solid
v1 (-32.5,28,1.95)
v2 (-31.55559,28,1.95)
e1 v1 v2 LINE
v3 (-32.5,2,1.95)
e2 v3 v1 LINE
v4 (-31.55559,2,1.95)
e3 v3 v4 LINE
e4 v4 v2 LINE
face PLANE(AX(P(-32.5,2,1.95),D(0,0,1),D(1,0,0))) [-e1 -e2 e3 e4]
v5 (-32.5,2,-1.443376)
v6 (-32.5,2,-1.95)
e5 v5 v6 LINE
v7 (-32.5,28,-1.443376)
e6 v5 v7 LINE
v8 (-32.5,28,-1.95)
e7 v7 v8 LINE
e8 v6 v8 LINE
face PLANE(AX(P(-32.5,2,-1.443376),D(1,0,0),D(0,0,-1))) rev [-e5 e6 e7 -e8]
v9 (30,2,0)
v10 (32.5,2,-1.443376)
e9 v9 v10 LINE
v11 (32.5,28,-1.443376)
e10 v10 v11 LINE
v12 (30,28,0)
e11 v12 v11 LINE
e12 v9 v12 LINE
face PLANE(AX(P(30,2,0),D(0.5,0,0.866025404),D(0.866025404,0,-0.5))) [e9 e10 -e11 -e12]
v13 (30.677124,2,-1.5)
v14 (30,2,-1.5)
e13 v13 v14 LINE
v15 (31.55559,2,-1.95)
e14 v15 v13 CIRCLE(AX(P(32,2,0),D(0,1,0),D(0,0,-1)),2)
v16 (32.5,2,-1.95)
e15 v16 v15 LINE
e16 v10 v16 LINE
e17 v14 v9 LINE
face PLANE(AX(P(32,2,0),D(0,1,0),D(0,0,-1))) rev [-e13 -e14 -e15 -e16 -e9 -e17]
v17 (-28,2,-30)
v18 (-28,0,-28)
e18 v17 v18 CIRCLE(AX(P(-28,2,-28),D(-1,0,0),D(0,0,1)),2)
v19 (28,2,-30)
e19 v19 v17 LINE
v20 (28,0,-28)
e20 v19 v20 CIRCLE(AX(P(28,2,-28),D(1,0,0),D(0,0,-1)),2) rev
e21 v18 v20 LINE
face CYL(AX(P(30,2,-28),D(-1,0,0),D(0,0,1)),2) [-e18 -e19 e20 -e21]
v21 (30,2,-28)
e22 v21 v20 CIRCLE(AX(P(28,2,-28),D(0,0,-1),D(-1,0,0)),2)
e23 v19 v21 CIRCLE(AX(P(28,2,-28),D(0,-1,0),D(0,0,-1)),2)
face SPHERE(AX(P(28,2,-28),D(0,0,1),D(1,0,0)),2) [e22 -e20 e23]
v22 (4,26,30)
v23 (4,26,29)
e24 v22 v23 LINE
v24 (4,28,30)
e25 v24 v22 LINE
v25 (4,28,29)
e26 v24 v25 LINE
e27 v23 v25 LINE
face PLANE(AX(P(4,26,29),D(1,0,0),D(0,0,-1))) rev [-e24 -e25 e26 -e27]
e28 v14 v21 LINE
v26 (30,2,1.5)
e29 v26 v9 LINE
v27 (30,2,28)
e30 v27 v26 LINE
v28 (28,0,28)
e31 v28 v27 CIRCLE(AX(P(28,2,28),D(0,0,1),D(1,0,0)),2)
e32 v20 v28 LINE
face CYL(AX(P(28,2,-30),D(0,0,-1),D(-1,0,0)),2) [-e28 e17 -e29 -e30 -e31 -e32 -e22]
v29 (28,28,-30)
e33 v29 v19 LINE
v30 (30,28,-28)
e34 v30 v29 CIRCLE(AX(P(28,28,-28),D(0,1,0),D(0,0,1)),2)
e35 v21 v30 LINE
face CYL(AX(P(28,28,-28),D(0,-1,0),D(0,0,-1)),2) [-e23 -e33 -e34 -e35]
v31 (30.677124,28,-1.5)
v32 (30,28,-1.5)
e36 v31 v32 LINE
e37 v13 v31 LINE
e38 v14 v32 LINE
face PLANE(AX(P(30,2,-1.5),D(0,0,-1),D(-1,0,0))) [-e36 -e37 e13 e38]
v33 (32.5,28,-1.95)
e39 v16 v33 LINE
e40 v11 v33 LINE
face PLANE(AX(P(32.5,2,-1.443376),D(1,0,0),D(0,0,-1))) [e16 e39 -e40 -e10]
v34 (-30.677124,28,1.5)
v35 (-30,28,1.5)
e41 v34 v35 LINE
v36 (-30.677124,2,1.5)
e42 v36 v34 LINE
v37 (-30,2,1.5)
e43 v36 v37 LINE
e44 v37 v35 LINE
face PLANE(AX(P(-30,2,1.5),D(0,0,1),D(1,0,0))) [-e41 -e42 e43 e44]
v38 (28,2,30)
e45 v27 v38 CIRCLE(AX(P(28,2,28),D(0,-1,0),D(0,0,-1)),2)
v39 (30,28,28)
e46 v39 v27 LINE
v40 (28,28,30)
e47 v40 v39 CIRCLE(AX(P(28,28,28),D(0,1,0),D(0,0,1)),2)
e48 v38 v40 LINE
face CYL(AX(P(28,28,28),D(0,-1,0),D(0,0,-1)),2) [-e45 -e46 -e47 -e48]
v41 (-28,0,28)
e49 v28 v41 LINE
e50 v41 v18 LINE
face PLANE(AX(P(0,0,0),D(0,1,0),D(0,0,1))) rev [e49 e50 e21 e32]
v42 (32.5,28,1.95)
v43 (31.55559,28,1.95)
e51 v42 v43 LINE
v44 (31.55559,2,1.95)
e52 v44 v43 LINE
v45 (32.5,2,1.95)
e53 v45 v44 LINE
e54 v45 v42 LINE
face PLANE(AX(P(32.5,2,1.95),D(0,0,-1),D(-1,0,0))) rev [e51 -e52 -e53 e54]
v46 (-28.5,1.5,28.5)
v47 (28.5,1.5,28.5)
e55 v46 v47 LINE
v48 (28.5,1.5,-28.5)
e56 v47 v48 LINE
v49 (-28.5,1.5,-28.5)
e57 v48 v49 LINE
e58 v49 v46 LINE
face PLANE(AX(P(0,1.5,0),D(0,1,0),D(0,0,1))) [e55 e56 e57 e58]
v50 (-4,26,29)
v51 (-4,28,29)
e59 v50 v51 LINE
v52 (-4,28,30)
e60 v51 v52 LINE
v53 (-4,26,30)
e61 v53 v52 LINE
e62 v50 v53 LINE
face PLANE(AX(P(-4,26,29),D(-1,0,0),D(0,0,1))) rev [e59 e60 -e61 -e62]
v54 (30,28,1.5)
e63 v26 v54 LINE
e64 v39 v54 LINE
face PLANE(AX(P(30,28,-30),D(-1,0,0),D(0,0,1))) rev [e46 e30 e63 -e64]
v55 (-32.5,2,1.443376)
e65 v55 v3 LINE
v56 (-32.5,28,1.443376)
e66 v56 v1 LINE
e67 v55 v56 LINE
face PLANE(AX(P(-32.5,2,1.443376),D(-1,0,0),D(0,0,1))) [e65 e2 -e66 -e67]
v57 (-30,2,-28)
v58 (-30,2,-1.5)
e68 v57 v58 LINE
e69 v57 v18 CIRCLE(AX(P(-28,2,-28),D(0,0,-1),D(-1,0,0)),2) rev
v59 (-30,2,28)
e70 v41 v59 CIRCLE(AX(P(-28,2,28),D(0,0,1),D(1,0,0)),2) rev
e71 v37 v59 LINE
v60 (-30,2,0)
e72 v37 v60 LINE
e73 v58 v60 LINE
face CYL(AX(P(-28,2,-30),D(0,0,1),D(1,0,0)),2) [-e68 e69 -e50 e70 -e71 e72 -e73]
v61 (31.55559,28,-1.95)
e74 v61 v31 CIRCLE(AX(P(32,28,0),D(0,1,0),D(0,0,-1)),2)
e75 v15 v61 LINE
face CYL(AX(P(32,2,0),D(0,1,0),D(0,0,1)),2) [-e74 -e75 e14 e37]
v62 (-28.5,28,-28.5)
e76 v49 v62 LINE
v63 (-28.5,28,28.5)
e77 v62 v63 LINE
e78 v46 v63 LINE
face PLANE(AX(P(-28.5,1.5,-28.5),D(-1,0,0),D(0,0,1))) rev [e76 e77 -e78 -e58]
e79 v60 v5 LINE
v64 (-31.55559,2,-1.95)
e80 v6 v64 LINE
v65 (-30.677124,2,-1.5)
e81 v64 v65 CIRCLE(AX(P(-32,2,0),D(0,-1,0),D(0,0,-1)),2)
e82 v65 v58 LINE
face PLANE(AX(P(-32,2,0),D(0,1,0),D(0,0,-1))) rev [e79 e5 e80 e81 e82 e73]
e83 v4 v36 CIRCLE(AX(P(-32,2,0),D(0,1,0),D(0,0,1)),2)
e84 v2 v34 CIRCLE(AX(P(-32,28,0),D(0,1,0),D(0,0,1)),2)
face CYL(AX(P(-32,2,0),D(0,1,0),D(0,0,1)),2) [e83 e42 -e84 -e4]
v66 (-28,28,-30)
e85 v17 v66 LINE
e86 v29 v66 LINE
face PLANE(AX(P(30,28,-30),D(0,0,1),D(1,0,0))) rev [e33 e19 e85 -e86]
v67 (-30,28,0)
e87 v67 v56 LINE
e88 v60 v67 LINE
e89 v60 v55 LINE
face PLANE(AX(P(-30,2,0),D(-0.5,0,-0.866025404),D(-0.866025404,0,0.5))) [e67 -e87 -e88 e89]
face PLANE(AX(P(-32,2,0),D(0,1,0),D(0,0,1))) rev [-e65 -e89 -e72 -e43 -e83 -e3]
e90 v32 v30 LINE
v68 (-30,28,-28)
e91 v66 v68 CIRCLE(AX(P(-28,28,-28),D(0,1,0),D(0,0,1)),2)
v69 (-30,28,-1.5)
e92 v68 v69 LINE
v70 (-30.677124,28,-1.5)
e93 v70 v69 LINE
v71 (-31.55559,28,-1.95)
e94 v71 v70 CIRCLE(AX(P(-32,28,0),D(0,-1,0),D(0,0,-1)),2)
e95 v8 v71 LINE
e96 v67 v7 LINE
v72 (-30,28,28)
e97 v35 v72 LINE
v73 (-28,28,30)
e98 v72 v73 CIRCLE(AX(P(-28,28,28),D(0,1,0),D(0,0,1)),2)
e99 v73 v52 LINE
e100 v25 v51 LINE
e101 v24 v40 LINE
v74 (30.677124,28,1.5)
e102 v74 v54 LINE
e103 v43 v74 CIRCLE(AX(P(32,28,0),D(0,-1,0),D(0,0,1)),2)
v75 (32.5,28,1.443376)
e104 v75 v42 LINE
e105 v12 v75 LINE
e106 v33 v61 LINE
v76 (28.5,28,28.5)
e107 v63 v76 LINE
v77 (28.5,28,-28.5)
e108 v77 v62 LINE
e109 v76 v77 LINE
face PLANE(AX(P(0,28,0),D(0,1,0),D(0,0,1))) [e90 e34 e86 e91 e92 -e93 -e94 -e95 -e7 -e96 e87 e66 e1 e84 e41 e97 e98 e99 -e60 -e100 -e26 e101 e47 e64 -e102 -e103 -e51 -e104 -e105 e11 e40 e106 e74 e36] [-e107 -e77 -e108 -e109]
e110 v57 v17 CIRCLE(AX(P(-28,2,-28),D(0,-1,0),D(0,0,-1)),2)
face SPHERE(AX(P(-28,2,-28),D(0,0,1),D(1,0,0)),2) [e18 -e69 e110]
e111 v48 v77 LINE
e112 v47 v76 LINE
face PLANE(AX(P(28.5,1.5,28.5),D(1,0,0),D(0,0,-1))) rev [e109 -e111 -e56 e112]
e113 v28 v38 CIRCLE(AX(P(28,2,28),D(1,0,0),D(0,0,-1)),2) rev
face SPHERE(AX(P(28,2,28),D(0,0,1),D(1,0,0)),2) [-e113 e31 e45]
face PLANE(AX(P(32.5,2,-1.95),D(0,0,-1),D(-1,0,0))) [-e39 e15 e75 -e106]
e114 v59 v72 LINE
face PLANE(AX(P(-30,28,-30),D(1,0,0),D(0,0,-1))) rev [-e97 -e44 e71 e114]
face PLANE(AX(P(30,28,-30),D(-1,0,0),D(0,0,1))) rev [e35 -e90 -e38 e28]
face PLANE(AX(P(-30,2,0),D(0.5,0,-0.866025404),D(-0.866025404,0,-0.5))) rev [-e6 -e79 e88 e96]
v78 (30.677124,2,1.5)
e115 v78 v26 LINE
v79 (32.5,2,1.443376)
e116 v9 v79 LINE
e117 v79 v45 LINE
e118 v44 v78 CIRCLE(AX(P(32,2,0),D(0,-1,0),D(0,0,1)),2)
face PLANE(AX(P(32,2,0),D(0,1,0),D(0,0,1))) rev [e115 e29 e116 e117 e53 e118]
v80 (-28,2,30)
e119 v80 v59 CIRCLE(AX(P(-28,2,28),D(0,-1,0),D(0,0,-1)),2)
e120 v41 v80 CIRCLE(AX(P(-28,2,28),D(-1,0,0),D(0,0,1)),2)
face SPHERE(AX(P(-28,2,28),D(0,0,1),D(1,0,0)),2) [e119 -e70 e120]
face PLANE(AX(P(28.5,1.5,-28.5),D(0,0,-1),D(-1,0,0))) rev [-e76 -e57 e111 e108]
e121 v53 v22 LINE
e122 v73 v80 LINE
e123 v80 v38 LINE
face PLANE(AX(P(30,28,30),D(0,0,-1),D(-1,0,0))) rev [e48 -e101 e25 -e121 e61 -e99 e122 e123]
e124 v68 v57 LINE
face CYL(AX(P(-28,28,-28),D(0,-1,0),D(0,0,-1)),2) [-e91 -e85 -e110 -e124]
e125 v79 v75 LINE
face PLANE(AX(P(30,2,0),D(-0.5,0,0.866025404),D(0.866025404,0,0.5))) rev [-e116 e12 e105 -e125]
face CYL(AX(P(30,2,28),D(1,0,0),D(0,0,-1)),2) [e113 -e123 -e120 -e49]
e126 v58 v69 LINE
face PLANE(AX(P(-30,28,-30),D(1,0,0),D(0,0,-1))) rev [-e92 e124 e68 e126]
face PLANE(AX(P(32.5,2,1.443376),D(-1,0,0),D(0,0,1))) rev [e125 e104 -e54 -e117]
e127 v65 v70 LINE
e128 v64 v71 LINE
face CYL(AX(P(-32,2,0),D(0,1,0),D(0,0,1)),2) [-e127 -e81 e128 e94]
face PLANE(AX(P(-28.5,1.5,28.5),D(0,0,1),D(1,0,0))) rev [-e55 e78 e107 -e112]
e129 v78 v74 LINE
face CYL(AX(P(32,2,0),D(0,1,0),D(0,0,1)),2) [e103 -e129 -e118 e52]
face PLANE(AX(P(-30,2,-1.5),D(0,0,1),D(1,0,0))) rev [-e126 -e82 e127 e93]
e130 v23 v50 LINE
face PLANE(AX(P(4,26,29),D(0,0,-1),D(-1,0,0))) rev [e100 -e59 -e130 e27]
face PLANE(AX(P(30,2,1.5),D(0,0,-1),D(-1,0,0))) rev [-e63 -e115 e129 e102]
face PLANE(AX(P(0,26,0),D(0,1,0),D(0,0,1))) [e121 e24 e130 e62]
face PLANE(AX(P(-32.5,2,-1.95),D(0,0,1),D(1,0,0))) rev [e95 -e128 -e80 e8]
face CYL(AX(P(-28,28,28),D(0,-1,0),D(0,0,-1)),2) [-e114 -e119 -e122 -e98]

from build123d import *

# Parameters (mm, degrees)
SKETCH_1_W            = 60
SKETCH_1_H            = 60
EXTRUDE_1_DEPTH       = 28
SKETCH_2_W            = 57
SKETCH_2_H            = 57
CUT_EXTRUDE_1_DEPTH   = 26.5
EXTRUDE_3_DEPTH       = 26
MIRROR_5_COPY_1_DEPTH = 26
SKETCH_4_W            = 8
SKETCH_4_H            = 2
CUT_EXTRUDE_2_DEPTH   = 2
FILLET_1_R            = 2


with BuildPart() as part:
    # 草图1 → 凸台-拉伸1 (new body)
    with BuildSketch(Plane(origin=(0, 0, 0), x_dir=(1, 0, 0), z_dir=(0, 1, 0))):
        Rectangle(SKETCH_1_W, SKETCH_1_H)
    extrude(amount=EXTRUDE_1_DEPTH)

    # 草图2 → 切除-拉伸1 (cut)
    with BuildSketch(Plane(origin=(0, 28, 0), x_dir=(1, 0, 0), z_dir=(0, 1, 0))):
        Rectangle(SKETCH_2_W, SKETCH_2_H)
    extrude(amount=-CUT_EXTRUDE_1_DEPTH, mode=Mode.SUBTRACT)

    # 草图3 → 凸台-拉伸3 (add)
    with BuildSketch(Plane(origin=(0, 28, 0), x_dir=(1, 0, 0), z_dir=(0, 1, 0))):
        with BuildLine():
            Line((-30, 0), (-30, -1.5))
            Line((-30, -1.5), (-30.677124344, -1.5))
            ThreePointArc((-30.677124344, -1.5), (-31.088161527, -1.780042303), (-31.555590279, -1.95))
            Line((-31.555590279, -1.95), (-32.5, -1.95))
            Line((-32.5, -1.95), (-32.5, -1.443375673))
            Line((-32.5, -1.443375673), (-30, 0))
        make_face()
    extrude_3 = extrude(amount=-EXTRUDE_3_DEPTH)

    # 镜向4: 凸台-拉伸3 across plane
    add(extrude_3.mirror(Plane.XY))

    # 镜向5: 凸台-拉伸3 across plane
    add(extrude_3.mirror(Plane(origin=(0, 0, 0), x_dir=(0, 0, 1), z_dir=(1, 0, 0))))

    # 镜向5 copy 1 sketch → 镜向5 copy 1 (add)
    with BuildSketch(Plane(origin=(0, 28, 0), x_dir=(-1, 0, 0), z_dir=(0, 1, 0))):
        with BuildLine():
            Line((-30, 0), (-30, -1.5))
            Line((-30, -1.5), (-30.677124344, -1.5))
            ThreePointArc((-30.677124344, -1.5), (-31.088161527, -1.780042303), (-31.555590279, -1.95))
            Line((-31.555590279, -1.95), (-32.5, -1.95))
            Line((-32.5, -1.95), (-32.5, -1.443375673))
            Line((-32.5, -1.443375673), (-30, 0))
        make_face()
    extrude(amount=-MIRROR_5_COPY_1_DEPTH)

    # 草图4 → 切除-拉伸2 (cut)
    with BuildSketch(Plane(origin=(0, 28, 0), x_dir=(1, 0, 0), z_dir=(0, 1, 0))):
        with Locations((0, -30)):
            Rectangle(SKETCH_4_W, SKETCH_4_H)
    extrude(amount=-CUT_EXTRUDE_2_DEPTH, mode=Mode.SUBTRACT)

    # 圆角1
    fillet_1_edges = [part.edges().sort_by_distance(p)[0] for p in [
        (-30, 0, 0),
        (0, 0, 30),
        (30, 0, 0),
        (0, 0, -30),
        (30, 14, 30),
        (-30, 14, 30),
        (30, 14, -30),
        (-30, 14, -30),
    ]]
    fillet(fillet_1_edges, radius=FILLET_1_R - 0.0001)  # a hair under: the kernel refuses the full size


solid = part.part
